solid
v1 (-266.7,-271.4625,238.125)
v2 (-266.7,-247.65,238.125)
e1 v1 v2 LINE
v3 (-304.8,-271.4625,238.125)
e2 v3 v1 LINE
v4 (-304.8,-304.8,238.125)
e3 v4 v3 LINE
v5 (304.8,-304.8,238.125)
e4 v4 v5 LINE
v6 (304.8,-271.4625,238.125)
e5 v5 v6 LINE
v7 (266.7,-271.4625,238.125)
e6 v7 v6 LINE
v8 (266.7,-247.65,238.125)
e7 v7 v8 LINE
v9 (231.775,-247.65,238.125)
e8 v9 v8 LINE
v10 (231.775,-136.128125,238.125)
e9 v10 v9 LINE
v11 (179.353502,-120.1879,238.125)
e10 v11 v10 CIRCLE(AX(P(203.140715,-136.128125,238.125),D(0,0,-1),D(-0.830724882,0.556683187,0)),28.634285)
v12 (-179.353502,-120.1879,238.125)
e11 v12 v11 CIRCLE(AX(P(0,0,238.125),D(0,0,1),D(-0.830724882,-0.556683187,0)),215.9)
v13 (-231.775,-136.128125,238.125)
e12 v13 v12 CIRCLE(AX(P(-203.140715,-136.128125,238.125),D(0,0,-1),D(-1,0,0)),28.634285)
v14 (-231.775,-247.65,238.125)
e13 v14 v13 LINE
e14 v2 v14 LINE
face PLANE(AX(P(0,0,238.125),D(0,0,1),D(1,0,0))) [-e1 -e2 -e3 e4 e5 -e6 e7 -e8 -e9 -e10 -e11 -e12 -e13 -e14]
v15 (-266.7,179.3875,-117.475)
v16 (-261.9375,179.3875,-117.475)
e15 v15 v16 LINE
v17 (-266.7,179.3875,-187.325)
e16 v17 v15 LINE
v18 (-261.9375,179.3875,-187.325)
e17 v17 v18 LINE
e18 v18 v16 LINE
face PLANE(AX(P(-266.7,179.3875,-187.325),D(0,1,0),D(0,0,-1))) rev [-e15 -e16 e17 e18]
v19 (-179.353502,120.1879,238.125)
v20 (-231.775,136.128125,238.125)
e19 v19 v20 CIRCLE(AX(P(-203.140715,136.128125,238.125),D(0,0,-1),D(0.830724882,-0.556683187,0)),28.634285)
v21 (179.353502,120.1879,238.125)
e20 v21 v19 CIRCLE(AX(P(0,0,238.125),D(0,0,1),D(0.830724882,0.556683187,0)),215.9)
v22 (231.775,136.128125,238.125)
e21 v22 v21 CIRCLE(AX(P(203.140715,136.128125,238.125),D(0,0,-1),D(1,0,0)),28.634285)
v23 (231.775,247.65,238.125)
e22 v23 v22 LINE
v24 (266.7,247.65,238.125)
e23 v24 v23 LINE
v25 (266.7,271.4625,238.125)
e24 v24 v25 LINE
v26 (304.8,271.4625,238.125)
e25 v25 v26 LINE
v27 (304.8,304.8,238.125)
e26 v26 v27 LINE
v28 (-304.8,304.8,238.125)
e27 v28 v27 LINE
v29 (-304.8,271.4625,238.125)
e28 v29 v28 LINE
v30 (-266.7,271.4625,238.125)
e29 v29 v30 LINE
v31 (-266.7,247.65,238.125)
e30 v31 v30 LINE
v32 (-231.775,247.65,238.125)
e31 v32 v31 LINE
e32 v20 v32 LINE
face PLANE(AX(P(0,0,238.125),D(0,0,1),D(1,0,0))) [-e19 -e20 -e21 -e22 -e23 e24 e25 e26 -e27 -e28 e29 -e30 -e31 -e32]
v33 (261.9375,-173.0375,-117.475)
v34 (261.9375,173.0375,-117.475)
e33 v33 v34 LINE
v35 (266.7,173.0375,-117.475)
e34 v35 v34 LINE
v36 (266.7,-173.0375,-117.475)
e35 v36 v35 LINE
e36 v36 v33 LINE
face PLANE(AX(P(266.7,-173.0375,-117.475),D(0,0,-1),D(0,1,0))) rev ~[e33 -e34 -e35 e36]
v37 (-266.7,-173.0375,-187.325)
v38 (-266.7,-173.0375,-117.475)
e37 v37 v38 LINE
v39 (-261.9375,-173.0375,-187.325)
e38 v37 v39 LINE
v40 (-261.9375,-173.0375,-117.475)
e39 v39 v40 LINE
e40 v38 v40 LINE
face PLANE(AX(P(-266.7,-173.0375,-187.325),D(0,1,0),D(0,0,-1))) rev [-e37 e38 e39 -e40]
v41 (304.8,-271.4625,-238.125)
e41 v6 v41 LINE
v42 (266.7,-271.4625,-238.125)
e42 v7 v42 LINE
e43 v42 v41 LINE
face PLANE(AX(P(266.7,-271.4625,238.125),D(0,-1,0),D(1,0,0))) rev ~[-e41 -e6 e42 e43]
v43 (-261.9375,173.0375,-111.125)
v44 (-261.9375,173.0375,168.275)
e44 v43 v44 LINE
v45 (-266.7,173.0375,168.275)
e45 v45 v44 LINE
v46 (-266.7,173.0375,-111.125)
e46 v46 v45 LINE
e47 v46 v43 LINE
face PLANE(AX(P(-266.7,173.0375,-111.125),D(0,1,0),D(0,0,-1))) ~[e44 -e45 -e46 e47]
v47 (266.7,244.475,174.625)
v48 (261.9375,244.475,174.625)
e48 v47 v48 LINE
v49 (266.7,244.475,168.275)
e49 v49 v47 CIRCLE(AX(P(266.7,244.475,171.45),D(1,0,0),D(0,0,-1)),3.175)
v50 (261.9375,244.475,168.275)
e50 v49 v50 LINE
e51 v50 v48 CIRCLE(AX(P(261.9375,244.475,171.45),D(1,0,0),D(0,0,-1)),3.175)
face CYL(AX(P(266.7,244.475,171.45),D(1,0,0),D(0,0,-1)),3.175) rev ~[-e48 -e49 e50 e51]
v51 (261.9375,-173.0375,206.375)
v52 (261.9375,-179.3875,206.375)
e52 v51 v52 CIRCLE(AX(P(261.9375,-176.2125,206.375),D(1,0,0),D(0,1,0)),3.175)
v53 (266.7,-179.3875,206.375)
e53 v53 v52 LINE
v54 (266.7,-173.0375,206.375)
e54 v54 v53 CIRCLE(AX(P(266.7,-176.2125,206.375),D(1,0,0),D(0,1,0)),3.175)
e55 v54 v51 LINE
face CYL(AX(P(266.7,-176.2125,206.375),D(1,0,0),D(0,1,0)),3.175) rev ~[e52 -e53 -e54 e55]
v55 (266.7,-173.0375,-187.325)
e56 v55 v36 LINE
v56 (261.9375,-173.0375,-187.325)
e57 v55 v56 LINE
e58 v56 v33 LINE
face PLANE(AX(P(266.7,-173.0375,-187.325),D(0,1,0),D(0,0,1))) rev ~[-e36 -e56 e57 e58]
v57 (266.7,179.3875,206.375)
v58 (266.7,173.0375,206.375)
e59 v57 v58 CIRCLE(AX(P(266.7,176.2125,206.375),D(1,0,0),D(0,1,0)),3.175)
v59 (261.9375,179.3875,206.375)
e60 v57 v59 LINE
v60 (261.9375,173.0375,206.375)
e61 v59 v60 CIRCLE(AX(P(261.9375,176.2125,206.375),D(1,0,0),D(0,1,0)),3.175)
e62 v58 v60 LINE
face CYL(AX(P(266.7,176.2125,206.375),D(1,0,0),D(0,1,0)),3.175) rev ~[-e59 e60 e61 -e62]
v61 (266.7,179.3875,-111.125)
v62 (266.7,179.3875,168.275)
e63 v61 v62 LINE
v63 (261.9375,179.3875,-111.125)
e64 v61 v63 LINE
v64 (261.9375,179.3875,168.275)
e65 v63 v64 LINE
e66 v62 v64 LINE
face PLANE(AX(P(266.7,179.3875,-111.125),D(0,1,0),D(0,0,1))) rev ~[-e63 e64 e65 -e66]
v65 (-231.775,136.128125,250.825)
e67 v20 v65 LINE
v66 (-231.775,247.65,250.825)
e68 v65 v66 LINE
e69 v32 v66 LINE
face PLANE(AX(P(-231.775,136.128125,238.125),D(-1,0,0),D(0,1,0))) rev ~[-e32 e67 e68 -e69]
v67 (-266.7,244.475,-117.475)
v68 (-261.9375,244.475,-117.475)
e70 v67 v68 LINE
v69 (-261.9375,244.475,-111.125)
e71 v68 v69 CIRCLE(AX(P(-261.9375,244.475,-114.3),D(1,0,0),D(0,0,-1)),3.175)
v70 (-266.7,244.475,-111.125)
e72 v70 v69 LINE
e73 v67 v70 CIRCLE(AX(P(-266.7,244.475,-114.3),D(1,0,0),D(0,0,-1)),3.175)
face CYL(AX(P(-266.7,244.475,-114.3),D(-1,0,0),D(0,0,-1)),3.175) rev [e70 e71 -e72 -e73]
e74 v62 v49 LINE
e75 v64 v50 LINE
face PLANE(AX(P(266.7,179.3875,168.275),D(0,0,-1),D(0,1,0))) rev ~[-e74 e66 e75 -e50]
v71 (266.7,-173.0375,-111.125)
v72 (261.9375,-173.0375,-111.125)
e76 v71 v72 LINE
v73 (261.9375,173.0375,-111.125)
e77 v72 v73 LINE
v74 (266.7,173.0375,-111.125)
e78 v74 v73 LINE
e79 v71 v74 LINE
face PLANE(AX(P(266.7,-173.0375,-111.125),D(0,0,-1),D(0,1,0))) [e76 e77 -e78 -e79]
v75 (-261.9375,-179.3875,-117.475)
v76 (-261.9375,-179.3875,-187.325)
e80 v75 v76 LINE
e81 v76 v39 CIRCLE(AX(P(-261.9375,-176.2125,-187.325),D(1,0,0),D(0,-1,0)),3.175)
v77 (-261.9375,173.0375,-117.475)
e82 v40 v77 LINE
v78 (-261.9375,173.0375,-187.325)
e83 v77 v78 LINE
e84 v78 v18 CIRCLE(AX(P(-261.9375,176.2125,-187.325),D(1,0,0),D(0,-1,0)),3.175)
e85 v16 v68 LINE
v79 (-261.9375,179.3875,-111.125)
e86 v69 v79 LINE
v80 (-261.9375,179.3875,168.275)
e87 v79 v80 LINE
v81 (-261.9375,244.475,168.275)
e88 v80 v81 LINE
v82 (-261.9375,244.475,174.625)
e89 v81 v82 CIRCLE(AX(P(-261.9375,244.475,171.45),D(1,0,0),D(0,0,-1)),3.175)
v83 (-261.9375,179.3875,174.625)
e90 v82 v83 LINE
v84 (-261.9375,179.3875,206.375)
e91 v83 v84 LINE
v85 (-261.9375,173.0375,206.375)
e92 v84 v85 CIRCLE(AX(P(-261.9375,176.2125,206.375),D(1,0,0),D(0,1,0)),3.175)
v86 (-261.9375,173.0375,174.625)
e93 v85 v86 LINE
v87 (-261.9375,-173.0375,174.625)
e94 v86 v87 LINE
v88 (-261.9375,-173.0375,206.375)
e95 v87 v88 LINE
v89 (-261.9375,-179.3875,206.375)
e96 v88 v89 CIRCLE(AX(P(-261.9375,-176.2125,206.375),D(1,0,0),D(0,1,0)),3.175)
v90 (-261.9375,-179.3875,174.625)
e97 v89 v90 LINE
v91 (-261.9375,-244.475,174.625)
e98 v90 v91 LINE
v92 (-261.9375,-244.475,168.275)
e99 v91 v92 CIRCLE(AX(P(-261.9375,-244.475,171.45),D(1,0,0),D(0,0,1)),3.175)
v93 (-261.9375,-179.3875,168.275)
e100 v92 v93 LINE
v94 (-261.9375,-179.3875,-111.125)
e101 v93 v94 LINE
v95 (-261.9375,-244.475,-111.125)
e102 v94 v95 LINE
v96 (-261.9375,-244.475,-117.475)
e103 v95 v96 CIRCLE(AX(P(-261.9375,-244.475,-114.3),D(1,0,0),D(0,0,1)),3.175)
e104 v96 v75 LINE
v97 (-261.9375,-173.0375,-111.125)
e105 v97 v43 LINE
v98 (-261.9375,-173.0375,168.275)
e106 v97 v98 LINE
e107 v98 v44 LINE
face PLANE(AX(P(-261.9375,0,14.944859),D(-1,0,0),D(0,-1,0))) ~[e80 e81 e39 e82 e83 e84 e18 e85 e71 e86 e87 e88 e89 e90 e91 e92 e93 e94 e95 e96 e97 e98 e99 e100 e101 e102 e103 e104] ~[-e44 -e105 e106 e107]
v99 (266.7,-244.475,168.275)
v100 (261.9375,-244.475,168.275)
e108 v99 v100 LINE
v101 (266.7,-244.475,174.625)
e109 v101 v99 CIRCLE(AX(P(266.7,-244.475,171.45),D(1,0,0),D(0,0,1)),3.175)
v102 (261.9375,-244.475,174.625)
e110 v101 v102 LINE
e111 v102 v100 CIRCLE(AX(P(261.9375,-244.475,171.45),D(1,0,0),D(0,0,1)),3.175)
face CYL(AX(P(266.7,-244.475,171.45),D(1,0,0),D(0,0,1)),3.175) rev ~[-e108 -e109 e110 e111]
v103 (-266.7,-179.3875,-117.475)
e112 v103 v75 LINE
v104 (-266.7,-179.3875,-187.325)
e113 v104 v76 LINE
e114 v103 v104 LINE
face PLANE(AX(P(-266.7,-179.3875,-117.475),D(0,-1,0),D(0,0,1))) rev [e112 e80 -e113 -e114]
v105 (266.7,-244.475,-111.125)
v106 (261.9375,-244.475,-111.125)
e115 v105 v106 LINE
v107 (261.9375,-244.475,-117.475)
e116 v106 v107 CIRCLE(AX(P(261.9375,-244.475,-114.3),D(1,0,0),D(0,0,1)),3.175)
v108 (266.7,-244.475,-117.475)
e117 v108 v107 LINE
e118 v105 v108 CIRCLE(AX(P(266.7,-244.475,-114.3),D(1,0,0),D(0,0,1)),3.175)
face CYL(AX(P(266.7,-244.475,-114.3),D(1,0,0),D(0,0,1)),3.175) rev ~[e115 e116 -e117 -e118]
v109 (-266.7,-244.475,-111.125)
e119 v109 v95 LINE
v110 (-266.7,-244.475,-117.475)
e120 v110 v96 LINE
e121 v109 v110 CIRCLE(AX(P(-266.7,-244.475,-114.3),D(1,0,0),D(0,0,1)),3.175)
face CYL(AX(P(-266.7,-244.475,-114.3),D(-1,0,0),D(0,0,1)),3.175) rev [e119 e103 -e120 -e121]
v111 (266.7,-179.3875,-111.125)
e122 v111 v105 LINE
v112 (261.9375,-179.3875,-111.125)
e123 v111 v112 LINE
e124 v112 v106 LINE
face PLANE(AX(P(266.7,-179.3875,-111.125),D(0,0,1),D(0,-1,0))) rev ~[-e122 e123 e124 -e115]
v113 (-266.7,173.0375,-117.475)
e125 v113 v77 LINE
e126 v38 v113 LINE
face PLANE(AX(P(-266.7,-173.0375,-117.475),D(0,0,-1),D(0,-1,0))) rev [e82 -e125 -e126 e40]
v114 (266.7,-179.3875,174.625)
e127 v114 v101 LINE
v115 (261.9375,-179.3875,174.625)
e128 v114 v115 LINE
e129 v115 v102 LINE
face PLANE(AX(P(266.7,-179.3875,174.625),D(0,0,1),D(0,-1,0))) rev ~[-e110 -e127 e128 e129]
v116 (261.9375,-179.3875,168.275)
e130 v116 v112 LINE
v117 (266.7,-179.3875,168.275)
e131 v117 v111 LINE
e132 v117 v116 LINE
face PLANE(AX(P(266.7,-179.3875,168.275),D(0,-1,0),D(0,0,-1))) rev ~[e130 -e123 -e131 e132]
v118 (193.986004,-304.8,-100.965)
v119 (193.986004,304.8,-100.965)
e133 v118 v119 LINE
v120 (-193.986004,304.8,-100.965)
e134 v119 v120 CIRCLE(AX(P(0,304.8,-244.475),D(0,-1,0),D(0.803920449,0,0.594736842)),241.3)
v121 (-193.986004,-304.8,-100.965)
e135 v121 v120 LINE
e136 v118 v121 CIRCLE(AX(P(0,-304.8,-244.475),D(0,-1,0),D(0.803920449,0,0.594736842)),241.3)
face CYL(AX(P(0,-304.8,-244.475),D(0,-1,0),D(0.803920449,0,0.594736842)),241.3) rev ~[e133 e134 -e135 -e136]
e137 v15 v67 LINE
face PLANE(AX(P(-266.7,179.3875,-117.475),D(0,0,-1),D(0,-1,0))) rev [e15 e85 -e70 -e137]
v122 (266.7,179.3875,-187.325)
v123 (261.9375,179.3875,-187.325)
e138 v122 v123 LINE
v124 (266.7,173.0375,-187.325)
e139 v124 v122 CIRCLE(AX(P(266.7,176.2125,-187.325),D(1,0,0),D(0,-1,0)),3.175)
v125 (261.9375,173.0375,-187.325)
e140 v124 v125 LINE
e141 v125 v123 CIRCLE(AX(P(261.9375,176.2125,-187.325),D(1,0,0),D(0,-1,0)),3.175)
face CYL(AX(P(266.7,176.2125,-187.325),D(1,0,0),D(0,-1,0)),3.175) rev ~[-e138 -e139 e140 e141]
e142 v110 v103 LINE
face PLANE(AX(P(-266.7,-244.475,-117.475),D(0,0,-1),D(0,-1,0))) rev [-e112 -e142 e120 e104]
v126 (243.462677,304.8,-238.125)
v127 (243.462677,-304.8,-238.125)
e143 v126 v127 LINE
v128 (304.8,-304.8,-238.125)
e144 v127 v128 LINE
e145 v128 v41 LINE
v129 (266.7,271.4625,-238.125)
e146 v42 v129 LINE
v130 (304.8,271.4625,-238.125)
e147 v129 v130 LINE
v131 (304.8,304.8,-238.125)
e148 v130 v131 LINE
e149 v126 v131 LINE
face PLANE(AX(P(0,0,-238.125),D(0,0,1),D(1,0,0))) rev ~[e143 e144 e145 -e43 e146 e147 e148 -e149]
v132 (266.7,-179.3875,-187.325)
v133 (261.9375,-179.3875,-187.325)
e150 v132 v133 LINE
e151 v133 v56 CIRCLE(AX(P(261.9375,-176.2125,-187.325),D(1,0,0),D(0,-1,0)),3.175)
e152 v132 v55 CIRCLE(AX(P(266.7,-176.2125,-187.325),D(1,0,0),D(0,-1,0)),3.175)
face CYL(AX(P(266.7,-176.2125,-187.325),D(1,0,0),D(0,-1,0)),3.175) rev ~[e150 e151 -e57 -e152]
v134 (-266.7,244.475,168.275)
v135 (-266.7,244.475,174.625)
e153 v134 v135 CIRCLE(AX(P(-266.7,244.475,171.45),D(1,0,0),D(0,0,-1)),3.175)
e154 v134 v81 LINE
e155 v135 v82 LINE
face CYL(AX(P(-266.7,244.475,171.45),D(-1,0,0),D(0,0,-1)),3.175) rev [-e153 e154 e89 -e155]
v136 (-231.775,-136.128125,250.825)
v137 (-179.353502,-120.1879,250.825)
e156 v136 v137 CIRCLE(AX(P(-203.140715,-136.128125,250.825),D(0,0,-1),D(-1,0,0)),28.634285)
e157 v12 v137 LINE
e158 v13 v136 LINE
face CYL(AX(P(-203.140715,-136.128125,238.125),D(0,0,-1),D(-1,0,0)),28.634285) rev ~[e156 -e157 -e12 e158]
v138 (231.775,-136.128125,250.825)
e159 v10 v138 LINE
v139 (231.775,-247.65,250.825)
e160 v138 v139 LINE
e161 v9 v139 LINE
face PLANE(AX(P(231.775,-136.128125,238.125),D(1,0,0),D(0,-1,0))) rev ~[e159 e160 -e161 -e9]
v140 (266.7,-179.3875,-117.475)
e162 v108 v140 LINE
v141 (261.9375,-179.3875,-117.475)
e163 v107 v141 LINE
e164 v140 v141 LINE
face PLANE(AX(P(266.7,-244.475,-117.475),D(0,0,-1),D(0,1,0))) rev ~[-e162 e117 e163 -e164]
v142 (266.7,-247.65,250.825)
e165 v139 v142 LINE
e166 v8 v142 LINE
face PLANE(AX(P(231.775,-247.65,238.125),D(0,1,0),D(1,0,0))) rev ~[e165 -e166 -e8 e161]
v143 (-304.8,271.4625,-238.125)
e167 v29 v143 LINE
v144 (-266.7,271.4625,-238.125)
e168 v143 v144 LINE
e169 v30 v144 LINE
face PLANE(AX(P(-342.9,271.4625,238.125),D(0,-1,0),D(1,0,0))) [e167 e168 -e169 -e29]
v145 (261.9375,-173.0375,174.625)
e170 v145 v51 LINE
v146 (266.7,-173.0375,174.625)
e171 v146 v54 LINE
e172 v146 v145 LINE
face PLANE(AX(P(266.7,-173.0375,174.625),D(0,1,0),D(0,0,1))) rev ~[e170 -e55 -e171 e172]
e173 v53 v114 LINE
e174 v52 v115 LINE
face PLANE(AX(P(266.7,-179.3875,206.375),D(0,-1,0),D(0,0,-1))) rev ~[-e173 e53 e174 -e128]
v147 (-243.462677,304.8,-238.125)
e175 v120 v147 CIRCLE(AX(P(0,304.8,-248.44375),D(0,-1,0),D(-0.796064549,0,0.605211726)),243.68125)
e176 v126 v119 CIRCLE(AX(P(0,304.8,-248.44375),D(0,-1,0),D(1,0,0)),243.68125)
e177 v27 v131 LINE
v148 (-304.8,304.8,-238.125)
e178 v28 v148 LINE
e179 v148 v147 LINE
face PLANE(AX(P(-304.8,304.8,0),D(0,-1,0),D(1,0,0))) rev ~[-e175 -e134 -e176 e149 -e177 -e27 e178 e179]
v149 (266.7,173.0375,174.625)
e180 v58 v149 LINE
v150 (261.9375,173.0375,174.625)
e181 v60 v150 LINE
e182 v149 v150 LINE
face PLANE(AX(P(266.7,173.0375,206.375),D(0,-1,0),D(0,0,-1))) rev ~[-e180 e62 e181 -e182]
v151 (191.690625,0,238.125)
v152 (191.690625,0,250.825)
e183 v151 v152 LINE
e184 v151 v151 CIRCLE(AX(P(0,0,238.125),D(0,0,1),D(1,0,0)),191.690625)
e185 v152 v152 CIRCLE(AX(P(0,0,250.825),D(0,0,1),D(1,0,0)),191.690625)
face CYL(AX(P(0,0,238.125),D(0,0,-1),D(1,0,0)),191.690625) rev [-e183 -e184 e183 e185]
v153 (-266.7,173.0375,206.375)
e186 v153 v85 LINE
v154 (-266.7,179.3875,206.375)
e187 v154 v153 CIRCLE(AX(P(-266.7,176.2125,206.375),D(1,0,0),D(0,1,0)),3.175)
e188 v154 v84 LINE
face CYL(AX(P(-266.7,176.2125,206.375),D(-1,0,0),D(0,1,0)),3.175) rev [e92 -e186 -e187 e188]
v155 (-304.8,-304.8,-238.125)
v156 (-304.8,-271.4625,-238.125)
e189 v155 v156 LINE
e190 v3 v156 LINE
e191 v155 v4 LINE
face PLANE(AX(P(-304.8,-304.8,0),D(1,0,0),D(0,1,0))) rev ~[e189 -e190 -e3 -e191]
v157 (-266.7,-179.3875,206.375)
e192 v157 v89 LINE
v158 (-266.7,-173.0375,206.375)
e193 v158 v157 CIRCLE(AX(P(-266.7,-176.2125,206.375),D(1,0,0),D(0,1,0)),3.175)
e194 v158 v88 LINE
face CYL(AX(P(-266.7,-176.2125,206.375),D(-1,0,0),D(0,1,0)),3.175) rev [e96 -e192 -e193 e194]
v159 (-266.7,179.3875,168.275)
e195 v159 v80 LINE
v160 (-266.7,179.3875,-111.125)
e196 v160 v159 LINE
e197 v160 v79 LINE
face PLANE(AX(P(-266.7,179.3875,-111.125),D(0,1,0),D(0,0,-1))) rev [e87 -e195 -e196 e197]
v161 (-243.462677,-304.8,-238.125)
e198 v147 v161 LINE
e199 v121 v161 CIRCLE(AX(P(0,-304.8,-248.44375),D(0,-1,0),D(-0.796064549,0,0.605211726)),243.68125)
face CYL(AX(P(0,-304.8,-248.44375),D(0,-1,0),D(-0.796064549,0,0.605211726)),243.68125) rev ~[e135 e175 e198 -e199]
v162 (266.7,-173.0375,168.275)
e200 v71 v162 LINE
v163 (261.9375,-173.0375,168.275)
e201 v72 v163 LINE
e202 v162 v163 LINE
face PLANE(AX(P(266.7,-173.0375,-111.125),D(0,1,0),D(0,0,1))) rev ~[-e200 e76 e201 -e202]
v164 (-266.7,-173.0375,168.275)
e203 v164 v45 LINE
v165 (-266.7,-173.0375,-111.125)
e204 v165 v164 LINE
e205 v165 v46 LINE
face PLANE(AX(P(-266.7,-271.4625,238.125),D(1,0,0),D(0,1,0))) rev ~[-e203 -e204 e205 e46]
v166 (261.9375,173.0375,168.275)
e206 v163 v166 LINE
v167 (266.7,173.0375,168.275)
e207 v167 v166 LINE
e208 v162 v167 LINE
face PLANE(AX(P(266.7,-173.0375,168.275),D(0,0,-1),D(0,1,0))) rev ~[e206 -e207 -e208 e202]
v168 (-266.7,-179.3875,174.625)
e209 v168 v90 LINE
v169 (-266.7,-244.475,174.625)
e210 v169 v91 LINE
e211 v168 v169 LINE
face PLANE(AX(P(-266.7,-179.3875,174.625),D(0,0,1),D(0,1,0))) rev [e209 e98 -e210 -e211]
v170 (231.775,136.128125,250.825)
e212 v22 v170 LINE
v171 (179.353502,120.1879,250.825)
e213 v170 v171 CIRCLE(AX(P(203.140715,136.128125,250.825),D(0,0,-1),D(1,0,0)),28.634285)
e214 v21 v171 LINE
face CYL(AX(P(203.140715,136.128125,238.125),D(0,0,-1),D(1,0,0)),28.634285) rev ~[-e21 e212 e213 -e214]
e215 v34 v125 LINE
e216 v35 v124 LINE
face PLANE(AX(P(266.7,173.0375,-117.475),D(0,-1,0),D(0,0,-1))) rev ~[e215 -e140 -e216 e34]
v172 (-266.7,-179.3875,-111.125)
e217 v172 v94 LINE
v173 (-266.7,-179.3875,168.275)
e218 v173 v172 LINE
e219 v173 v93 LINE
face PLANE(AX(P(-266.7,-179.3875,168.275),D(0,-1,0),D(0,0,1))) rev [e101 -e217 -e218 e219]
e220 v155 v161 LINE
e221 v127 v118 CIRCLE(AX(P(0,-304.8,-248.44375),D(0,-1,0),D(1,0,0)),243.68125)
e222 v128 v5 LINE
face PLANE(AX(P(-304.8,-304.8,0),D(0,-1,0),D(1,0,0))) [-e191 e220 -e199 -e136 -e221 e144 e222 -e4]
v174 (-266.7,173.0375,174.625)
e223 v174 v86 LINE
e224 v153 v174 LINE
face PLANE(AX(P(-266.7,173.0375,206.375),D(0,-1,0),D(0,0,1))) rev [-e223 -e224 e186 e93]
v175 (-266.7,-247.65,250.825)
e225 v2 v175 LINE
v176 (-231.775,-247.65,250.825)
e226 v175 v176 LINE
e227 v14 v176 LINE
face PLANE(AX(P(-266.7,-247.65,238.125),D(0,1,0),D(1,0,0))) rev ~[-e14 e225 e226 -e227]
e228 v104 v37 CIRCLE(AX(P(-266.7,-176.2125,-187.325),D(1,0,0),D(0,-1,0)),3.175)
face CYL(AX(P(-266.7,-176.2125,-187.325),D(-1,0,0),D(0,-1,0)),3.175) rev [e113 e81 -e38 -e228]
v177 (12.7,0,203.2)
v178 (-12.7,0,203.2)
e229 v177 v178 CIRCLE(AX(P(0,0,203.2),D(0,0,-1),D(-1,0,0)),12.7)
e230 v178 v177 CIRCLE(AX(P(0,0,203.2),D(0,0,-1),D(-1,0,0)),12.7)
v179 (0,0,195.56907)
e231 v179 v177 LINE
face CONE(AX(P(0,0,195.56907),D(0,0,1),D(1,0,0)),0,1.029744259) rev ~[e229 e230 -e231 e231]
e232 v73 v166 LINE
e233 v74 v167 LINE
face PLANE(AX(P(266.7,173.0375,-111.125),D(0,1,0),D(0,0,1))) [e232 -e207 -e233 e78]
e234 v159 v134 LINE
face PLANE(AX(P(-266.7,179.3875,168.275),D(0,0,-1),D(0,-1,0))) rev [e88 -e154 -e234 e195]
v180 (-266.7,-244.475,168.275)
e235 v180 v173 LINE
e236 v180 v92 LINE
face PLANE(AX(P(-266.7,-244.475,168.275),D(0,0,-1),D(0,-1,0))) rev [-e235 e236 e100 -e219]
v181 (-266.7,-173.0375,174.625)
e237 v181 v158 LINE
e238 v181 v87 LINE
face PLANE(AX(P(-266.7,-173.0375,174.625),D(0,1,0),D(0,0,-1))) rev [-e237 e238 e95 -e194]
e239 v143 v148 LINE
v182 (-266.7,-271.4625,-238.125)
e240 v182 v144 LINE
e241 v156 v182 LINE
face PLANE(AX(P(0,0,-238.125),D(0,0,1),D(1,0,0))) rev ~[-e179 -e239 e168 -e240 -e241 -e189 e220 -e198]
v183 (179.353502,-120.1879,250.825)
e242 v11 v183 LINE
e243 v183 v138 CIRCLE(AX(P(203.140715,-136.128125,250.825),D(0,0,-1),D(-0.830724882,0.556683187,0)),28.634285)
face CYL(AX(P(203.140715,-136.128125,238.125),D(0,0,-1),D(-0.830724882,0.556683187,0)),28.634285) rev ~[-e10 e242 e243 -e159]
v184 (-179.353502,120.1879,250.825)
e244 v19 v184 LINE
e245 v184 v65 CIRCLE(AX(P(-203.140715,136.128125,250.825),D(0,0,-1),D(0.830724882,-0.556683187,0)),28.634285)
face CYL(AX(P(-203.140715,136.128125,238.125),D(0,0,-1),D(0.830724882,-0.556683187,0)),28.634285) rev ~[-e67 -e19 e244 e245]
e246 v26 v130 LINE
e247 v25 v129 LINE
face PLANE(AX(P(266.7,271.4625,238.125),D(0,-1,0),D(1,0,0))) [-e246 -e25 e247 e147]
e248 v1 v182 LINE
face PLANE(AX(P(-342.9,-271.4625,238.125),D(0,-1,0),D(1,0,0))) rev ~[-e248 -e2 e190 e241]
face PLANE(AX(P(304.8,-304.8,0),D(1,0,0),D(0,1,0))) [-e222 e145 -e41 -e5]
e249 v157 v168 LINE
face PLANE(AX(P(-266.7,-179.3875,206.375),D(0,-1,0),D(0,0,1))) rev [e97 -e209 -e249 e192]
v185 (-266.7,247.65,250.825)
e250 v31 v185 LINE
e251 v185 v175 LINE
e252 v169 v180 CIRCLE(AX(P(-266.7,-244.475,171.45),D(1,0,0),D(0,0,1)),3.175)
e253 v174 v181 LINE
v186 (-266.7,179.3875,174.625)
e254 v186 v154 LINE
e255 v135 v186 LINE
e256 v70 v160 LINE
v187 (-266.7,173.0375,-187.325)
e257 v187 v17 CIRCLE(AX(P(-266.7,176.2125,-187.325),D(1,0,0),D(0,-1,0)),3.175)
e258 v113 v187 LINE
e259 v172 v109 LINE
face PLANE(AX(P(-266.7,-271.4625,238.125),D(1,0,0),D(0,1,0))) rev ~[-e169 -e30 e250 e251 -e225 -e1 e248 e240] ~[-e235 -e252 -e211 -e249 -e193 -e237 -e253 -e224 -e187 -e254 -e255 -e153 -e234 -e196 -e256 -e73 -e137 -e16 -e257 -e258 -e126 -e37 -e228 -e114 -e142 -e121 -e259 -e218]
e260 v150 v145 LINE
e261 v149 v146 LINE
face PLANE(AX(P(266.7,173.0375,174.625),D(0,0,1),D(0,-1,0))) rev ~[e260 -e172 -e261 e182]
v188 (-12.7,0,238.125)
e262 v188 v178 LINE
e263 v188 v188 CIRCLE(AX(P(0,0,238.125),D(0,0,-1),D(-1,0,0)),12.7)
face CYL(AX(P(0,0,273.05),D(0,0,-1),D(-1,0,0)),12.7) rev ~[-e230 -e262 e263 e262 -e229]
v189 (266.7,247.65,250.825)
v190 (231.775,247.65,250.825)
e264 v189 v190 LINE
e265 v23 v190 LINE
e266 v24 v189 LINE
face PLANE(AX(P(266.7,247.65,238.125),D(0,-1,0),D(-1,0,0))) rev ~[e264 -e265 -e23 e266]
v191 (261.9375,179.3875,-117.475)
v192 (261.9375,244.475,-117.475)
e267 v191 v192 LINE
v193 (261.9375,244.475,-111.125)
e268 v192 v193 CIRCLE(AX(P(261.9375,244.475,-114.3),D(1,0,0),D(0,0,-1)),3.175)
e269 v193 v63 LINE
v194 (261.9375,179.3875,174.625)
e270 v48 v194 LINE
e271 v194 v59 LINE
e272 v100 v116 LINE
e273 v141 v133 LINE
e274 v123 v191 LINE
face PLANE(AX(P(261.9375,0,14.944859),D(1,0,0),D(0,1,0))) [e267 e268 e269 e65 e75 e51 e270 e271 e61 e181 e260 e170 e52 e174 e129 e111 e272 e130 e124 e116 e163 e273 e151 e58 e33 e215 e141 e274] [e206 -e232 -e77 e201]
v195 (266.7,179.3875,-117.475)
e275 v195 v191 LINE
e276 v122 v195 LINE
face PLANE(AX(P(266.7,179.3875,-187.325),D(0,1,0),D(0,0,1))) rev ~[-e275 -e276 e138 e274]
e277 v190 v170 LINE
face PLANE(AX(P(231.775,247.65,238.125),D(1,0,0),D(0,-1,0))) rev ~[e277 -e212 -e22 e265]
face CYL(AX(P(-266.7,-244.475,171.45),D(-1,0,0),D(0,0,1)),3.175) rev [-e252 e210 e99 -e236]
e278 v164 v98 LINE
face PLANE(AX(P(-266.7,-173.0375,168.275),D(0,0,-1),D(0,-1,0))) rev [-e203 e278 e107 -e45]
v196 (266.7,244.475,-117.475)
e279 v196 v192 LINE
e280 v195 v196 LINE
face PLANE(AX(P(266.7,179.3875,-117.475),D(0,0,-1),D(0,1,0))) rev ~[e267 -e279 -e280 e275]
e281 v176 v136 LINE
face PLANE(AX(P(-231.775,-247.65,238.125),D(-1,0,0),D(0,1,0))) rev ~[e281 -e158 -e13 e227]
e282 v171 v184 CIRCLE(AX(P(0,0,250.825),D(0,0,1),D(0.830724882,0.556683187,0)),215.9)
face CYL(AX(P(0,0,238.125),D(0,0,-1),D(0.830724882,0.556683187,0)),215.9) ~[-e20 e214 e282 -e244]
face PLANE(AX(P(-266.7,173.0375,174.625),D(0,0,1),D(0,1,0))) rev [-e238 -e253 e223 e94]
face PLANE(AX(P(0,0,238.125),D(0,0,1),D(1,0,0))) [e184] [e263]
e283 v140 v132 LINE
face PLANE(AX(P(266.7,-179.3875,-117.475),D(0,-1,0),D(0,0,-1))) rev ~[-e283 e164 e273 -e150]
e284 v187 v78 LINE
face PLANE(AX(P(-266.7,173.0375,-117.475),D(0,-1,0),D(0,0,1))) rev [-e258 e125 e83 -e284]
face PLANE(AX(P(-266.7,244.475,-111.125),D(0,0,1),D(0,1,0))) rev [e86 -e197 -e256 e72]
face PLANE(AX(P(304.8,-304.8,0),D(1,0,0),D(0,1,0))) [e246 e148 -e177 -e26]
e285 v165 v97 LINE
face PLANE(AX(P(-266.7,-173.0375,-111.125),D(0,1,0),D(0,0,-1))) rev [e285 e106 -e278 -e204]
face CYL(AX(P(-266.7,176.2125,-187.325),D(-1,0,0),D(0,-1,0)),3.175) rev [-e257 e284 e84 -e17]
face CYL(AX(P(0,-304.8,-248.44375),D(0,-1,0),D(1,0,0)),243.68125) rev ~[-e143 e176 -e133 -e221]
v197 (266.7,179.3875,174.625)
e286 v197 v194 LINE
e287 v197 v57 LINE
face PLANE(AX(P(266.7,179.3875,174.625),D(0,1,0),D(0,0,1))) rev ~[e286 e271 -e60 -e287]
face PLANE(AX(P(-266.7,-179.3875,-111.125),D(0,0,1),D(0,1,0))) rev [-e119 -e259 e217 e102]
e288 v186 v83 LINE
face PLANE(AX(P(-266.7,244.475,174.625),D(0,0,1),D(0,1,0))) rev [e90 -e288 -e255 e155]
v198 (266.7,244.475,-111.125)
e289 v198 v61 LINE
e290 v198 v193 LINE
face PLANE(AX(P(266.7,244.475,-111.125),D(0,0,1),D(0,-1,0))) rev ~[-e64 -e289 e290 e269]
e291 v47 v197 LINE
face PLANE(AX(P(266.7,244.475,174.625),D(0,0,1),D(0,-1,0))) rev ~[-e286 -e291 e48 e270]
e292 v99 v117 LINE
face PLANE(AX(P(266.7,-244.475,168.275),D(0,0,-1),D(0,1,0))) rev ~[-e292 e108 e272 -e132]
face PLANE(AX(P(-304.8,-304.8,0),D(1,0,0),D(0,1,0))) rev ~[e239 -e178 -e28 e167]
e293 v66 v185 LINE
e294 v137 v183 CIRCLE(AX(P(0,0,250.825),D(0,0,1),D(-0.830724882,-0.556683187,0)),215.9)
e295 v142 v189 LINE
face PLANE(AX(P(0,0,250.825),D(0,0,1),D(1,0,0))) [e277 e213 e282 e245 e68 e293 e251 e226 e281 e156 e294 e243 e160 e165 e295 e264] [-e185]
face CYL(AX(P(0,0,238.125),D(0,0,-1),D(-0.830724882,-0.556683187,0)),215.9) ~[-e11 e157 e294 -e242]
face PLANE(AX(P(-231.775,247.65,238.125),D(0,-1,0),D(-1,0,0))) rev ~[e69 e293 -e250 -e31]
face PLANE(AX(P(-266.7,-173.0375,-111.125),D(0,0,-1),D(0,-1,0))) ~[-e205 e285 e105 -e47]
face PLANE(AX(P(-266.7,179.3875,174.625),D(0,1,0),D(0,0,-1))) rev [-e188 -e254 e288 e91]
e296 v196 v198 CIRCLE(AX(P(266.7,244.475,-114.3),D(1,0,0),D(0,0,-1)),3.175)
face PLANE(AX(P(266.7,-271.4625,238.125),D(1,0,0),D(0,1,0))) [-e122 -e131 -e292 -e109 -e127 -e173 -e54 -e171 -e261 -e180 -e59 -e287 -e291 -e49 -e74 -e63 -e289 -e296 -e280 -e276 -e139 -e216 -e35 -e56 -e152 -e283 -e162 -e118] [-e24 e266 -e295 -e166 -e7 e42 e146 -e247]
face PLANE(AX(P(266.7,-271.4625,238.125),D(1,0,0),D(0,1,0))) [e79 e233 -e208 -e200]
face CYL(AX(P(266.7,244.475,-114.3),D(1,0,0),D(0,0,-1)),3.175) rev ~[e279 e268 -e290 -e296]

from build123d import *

# Parameters (mm, degrees)
F0_W      = 609.6
F0_H      = 609.6
F1_DEPTH  = 238.125
F3_DEPTH  = 609.601
F4_W      = 76.2
F4_H      = 542.925
F5_DEPTH  = 476.251
F6_R      = 191.690625
F7_DEPTH  = 12.7
F9_D      = 25.4
F9_DEPTH  = 34.925
F9_TIP    = 7.6309298617
F10_W     = 346.075
F10_H     = 279.4
F11_DEPTH = 4.7625


# Not quite as in the source:
# - a pattern or mirror of a feature is missing from the dataset's text; its kind, count and spacing are read off the source's solid


with BuildPart() as f1:
    # F0 (on Top) → F1 (new body, symmetric)
    with BuildSketch(Plane.XY):
        Rectangle(F0_W, F0_H)
    extrude(amount=F1_DEPTH, both=True)

    # F2 (on face) → F3 (cut, through all)
    with BuildSketch(Plane.XZ.offset(304.8)):
        with BuildLine():
            ThreePointArc((-193.9860043921, -100.965), (-230.9234761066, -170.6305134371), (-243.68125, -248.44375))
            Line((-243.68125, -248.44375), (243.68125, -248.44375))
            ThreePointArc((243.68125, -248.44375), (230.9234761066, -170.6305134371), (193.9860043921, -100.965))
            ThreePointArc((193.9860043921, -100.965), (0, -3.175), (-193.9860043921, -100.965))
        make_face()
    extrude(amount=-F3_DEPTH, mode=Mode.SUBTRACT)

    # F4 (on face) → F5 (cut, through all)
    with BuildSketch(Plane.XY.offset(238.125)):
        with Locations((304.8, 0)):
            Rectangle(F4_W, F4_H)
        with Locations((-304.8, 0)):
            Rectangle(F4_W, F4_H)
    extrude(amount=-F5_DEPTH, mode=Mode.SUBTRACT)

    # F6 (on face) → F7 (join)
    with BuildSketch(Plane.XY.offset(238.125)):
        with BuildLine():
            ThreePointArc((-231.775, -136.128125), (-211.4711543972, -108.732394395), (-179.3535020392, -120.1878999995))
            ThreePointArc((-179.3535020392, -120.1878999995), (0, -215.9), (179.3535020392, -120.1878999995))
            ThreePointArc((179.3535020392, -120.1878999995), (211.4711543972, -108.732394395), (231.775, -136.128125))
            Line((231.775, -136.128125), (231.775, -247.65))
            Line((231.775, -247.65), (266.7, -247.65))
            Line((266.7, -247.65), (266.7, 247.65))
            Line((266.7, 247.65), (231.775, 247.65))
            Line((231.775, 247.65), (231.775, 136.128125))
            ThreePointArc((231.775, 136.128125), (211.4711543972, 108.732394395), (179.3535020392, 120.1878999995))
            ThreePointArc((179.3535020392, 120.1878999995), (0, 215.9), (-179.3535020392, 120.1878999995))
            ThreePointArc((-179.3535020392, 120.1878999995), (-211.4711543972, 108.732394395), (-231.775, 136.128125))
            Line((-231.775, 136.128125), (-231.775, 247.65))
            Line((-231.775, 247.65), (-266.7, 247.65))
            Line((-266.7, 247.65), (-266.7, -247.65))
            Line((-266.7, -247.65), (-231.775, -247.65))
            Line((-231.775, -247.65), (-231.775, -136.128125))
        make_face()
        Circle(F6_R, mode=Mode.SUBTRACT)
    extrude(amount=F7_DEPTH)

    # F9
    with Locations(Plane.XY.offset(238.125)):
        with Locations((0, 0)):
            Hole(F9_D / 2, depth=F9_DEPTH)
            with Locations((0, 0, -(F9_DEPTH + F9_TIP / 2))):  # 118° drill point
                Cone(0, F9_D / 2, F9_TIP, mode=Mode.SUBTRACT)

    # F10 (on face) → F11 (cut)
    with BuildSketch(Plane.YZ.offset(266.7)):
        with BuildLine():
            Line((179.3875, -117.475), (244.475, -117.475))
            ThreePointArc((244.475, -117.475), (247.65, -114.3), (244.475, -111.125))
            Line((244.475, -111.125), (179.3875, -111.125))
            Line((179.3875, -111.125), (179.3875, 168.275))
            Line((179.3875, 168.275), (244.475, 168.275))
            ThreePointArc((244.475, 168.275), (247.65, 171.45), (244.475, 174.625))
            Line((244.475, 174.625), (179.3875, 174.625))
            Line((179.3875, 174.625), (179.3875, 206.375))
            ThreePointArc((179.3875, 206.375), (176.2125, 209.55), (173.0375, 206.375))
            Line((173.0375, 206.375), (173.0375, 174.625))
            Line((173.0375, 174.625), (-173.0375, 174.625))
            Line((-173.0375, 174.625), (-173.0375, 206.375))
            ThreePointArc((-173.0375, 206.375), (-176.2125, 209.55), (-179.3875, 206.375))
            Line((-179.3875, 206.375), (-179.3875, 174.625))
            Line((-179.3875, 174.625), (-244.475, 174.625))
            ThreePointArc((-244.475, 174.625), (-247.65, 171.45), (-244.475, 168.275))
            Line((-244.475, 168.275), (-179.3875, 168.275))
            Line((-179.3875, 168.275), (-179.3875, -111.125))
            Line((-179.3875, -111.125), (-244.475, -111.125))
            ThreePointArc((-244.475, -111.125), (-247.65, -114.3), (-244.475, -117.475))
            Line((-244.475, -117.475), (-179.3875, -117.475))
            Line((-179.3875, -117.475), (-179.3875, -187.325))
            ThreePointArc((-179.3875, -187.325), (-176.2125, -190.5), (-173.0375, -187.325))
            Line((-173.0375, -187.325), (-173.0375, -117.475))
            Line((-173.0375, -117.475), (173.0375, -117.475))
            Line((173.0375, -117.475), (173.0375, -187.325))
            ThreePointArc((173.0375, -187.325), (176.2125, -190.5), (179.3875, -187.325))
            Line((179.3875, -187.325), (179.3875, -117.475))
        make_face()
        with Locations((0, 28.575)):
            Rectangle(F10_W, F10_H, mode=Mode.SUBTRACT)
    f11 = extrude(amount=-F11_DEPTH, mode=Mode.SUBTRACT)

    # F11_copies: F11 across plane
    add(f11.mirror(Plane(origin=(0, 0, 0), x_dir=(0, 0, -1), z_dir=(-1, 0, 0))), mode=Mode.SUBTRACT)


solid = f1.part
